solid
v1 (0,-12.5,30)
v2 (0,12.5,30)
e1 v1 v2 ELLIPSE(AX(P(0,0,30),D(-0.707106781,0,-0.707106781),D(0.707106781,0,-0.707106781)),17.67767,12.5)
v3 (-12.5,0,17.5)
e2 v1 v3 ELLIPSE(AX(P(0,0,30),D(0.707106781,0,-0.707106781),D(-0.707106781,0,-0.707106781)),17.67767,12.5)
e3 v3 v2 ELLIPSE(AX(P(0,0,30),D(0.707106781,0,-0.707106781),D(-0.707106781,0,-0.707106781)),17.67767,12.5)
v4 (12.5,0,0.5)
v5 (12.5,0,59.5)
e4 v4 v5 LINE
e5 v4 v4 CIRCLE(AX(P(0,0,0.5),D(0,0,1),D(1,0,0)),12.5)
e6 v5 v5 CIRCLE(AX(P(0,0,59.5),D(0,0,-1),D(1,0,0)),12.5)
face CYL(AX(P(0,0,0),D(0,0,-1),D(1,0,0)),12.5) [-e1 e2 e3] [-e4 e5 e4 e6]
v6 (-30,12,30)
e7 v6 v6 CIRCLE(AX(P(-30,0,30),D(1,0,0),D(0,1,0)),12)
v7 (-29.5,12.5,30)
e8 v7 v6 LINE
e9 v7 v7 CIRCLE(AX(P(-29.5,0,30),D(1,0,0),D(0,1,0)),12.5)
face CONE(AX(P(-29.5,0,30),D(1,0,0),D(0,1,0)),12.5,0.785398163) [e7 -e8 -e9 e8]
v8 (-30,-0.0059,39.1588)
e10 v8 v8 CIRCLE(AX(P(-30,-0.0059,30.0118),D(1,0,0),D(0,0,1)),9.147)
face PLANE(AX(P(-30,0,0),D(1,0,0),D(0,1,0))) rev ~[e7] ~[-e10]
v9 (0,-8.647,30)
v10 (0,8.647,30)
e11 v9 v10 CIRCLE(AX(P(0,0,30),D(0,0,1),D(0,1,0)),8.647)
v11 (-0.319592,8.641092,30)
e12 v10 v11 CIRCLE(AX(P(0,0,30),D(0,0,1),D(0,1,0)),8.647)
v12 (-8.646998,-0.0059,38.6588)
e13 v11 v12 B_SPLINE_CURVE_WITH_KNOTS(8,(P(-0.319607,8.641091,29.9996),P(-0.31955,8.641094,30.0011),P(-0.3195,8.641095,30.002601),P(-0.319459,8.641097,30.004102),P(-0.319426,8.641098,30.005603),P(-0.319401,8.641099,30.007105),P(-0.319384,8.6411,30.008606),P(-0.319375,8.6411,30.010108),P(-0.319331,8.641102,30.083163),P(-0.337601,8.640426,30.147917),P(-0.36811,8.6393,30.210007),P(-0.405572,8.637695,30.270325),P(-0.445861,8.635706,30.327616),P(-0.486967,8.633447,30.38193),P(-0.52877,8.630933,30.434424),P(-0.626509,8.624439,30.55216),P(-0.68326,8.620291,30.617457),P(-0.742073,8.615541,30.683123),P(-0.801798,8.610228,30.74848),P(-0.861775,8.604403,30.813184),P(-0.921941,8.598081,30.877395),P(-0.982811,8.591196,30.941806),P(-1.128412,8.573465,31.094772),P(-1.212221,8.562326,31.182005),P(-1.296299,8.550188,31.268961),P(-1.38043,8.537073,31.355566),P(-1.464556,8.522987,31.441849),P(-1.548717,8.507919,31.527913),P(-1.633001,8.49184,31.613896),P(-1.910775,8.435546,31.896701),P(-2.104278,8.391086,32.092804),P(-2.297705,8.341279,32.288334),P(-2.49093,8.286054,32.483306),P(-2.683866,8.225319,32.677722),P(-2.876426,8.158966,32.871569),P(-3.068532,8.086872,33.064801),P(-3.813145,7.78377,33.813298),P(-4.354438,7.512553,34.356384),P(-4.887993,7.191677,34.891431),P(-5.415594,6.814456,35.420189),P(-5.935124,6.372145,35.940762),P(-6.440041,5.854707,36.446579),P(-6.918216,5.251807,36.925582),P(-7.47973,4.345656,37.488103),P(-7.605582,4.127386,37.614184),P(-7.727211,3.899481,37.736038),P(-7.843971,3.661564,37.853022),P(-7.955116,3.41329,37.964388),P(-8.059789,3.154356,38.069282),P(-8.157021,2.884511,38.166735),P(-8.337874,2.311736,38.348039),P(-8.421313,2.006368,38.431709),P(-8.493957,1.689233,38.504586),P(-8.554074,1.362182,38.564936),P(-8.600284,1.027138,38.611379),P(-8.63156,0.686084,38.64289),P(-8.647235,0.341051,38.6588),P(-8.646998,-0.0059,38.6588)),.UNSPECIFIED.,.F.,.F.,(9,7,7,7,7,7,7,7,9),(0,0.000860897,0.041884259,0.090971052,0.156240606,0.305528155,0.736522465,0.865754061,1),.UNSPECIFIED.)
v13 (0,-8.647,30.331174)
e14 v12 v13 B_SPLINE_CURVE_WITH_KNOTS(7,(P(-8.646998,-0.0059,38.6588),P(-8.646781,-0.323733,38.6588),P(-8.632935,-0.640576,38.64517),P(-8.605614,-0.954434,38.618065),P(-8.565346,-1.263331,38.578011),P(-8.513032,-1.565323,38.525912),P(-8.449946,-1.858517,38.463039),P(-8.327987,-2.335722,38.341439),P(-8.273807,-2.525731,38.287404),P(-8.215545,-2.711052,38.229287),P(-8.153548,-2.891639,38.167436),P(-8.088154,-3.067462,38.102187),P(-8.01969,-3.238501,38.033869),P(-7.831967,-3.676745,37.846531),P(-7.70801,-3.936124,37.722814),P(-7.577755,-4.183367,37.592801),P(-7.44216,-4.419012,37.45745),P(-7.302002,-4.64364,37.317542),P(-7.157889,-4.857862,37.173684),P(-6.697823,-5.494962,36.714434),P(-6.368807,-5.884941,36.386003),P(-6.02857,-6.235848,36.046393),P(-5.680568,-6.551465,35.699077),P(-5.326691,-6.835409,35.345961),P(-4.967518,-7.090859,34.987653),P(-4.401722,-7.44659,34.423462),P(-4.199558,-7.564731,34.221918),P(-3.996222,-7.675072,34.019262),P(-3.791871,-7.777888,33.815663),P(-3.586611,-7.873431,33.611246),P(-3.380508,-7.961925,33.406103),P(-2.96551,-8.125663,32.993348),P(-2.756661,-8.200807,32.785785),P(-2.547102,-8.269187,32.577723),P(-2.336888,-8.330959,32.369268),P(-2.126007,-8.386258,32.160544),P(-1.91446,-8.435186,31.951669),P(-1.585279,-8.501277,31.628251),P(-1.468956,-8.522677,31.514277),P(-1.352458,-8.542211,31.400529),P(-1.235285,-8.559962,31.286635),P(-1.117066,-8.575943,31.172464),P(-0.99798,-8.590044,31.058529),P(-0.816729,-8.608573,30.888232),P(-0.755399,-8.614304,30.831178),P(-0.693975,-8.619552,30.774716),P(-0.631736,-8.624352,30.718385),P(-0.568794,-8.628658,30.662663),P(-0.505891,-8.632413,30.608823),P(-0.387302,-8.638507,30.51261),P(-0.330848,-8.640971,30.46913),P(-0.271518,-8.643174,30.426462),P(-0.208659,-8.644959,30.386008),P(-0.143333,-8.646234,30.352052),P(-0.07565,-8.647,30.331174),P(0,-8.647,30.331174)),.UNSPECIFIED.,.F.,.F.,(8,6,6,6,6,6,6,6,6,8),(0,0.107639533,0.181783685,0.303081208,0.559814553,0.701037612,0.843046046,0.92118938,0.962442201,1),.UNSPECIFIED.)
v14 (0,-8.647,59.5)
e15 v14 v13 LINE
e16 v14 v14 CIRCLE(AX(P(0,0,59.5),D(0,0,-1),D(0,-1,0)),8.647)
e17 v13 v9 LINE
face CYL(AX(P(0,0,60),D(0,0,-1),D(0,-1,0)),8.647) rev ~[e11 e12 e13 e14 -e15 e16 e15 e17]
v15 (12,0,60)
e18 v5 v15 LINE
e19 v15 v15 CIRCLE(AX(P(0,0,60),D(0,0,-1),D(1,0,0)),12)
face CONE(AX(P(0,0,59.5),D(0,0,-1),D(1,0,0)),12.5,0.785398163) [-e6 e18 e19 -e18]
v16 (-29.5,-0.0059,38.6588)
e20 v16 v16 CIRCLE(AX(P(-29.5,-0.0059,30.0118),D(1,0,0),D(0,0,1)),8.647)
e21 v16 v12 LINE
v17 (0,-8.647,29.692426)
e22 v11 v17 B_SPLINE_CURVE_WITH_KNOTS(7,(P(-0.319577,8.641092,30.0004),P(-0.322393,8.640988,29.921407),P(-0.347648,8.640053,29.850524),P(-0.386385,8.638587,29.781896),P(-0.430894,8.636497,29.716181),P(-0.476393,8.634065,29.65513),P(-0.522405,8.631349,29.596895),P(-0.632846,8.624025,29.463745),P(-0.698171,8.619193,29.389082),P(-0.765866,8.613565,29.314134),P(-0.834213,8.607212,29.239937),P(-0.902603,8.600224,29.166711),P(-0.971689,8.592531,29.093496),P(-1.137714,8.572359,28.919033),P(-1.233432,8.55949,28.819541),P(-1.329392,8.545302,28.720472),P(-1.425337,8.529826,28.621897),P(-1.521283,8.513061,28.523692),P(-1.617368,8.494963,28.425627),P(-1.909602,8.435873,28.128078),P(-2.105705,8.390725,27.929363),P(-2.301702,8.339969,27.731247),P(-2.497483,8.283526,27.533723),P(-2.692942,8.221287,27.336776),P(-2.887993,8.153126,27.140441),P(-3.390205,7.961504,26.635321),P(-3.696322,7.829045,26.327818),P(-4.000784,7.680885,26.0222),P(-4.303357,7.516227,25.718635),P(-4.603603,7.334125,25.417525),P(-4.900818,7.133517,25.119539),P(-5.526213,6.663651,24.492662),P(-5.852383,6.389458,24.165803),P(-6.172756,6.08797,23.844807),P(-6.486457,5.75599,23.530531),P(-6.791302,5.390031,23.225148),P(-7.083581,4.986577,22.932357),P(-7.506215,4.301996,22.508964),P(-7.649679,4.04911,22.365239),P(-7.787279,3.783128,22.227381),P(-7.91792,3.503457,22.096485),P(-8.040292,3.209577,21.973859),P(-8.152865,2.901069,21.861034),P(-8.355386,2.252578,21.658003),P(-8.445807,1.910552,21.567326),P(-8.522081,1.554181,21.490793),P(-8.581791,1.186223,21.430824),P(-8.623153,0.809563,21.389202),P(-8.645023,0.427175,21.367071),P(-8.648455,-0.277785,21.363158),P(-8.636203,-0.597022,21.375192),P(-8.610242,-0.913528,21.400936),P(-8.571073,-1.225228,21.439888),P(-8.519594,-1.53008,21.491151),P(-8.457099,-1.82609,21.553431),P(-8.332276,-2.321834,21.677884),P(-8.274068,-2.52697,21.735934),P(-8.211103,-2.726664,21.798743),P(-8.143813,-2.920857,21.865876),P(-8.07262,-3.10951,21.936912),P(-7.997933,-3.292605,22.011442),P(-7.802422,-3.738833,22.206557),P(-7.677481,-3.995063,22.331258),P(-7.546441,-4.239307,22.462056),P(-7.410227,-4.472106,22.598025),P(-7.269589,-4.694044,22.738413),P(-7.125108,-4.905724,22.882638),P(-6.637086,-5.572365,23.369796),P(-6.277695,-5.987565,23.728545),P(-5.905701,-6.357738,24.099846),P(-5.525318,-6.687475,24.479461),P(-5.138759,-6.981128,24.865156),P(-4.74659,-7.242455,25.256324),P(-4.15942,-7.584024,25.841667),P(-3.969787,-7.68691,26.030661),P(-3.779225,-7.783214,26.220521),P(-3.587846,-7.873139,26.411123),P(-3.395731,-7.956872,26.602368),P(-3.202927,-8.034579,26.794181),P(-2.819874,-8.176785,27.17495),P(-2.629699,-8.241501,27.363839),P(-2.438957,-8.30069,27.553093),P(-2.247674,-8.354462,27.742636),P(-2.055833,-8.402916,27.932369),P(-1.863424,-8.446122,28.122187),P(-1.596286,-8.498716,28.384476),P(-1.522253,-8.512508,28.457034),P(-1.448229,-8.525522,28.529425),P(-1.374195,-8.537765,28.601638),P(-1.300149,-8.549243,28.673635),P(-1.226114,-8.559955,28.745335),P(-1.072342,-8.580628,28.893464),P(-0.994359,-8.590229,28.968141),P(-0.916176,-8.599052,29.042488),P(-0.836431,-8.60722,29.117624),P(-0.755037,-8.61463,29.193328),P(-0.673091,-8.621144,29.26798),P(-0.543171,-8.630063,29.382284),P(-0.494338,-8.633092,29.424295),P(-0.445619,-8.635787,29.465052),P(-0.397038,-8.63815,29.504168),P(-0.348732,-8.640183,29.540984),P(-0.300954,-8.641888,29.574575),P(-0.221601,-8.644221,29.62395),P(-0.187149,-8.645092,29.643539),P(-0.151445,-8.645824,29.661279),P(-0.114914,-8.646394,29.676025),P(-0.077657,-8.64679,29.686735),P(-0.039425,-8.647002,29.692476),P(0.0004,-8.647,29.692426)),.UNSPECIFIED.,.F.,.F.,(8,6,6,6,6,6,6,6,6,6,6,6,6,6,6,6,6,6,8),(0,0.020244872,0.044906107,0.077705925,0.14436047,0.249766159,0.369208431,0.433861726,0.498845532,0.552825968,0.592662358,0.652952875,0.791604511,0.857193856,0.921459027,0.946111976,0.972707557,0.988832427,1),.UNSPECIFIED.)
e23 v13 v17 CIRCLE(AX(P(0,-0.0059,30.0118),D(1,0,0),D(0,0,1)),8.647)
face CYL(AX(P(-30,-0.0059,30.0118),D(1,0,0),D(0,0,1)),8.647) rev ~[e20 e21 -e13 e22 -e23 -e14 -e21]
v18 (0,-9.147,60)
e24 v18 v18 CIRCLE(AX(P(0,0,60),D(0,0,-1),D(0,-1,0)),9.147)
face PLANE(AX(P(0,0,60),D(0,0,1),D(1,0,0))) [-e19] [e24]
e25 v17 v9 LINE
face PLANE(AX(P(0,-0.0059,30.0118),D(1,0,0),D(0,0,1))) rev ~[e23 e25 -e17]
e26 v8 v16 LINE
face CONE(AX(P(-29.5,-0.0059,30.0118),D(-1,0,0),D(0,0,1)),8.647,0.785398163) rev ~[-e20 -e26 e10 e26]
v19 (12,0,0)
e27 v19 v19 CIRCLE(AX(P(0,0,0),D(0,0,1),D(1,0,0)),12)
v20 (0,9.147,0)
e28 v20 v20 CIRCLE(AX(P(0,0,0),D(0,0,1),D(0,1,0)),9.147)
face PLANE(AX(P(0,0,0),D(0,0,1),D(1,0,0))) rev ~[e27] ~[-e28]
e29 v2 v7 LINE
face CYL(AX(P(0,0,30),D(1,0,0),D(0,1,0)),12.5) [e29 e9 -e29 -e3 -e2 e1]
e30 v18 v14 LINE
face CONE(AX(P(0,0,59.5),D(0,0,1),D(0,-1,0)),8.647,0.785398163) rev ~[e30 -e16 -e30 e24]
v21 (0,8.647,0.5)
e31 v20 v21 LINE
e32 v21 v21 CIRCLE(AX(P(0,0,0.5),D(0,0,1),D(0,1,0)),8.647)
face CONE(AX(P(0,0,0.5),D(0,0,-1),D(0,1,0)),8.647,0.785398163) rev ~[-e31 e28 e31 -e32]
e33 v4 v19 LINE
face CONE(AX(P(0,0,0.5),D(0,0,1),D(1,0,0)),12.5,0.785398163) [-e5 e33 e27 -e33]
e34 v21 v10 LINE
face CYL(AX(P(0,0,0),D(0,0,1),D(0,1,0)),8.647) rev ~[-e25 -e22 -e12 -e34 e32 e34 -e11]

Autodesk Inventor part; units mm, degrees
ref_plane "YZ Plane" through (0, 0, 0) normal (1, 0, 0) x (0, 1, 0)
ref_plane "XZ Plane" through (0, 0, 0) normal (0, 1, 0) x (-1, 0, 0)
ref_plane "XY Plane" through (0, 0, 0) normal (0, 0, 1) x (1, 0, 0)
sketch "Skizze1" plane through (0, 0, 0) normal (0, 0, 1) x (1, 0, 0)
  line L0 (-17.5, 0) -> (17.5, 0) projected
  line L1 (0, -17.5) -> (0, 17.5) projected
  circle A0 centre (0, 0) radius 12.5
  dimension "d0" = 25
extrude "Extrusion1" add sketch "Skizze1" along normal blind 60
sketch "Skizze2" plane through (0, 0, 60) normal (0, 0, 1) x (1, 0, 0)
  circle A0 centre (0, 0) radius 10.8915
sketch "Skizze3" plane through (0, 0, 0) normal (1, 0, 0) x (0, 1, 0)
  line L0 (12.5, 0) -> (-12.5, 0) projected
  circle A0 centre (0, 30) radius 12.5
  point P0 (0, 0)
  dimension "d3" = 30
  dimension "d4" = 25
extrude "Extrusion2" add sketch "Skizze3" against normal blind 30
sketch "Skizze4" plane through (0, 0, 0) normal (0, 0, -1) x (-1, 0, 0)
  point P0 (0, 0)
hole "Bohrung1" at (0, 0, 0) direction (0, 0, 1) diameter 17.294 depth 30 thread size "M20x2.5" class "6H" standard "ISO Metric profile"
hole "Bohrung2" at (0, 0, 60) direction (0, 0, -1) diameter 17.294 depth 30 thread size "M20x2.5" class "6H" standard "ISO Metric profile"
sketch "Skizze5" plane through (-30, 0, 30) normal (-1, 0, 0) x (0, 0, 1)
  point P0 (-30, 0)
  point P1 (0.0118, -0.0059)
hole "Bohrung3" at (-30, -0.0059, 30.0118) direction (1, 0, 0) diameter 17.294 depth 30 thread size "M20x2.5" class "6H" standard "ISO Metric profile"
chamfer "Fase1" distance 0.5 angle 45 6 edges at (-12.5, 0, 60) (0, 8.647, 60) (-30, -12.5, 30) (-30, -0.0059, 21.3648) (-12.5, 0, 0) (0, -8.647, 0)
properties part number "Verbindungsstück"
